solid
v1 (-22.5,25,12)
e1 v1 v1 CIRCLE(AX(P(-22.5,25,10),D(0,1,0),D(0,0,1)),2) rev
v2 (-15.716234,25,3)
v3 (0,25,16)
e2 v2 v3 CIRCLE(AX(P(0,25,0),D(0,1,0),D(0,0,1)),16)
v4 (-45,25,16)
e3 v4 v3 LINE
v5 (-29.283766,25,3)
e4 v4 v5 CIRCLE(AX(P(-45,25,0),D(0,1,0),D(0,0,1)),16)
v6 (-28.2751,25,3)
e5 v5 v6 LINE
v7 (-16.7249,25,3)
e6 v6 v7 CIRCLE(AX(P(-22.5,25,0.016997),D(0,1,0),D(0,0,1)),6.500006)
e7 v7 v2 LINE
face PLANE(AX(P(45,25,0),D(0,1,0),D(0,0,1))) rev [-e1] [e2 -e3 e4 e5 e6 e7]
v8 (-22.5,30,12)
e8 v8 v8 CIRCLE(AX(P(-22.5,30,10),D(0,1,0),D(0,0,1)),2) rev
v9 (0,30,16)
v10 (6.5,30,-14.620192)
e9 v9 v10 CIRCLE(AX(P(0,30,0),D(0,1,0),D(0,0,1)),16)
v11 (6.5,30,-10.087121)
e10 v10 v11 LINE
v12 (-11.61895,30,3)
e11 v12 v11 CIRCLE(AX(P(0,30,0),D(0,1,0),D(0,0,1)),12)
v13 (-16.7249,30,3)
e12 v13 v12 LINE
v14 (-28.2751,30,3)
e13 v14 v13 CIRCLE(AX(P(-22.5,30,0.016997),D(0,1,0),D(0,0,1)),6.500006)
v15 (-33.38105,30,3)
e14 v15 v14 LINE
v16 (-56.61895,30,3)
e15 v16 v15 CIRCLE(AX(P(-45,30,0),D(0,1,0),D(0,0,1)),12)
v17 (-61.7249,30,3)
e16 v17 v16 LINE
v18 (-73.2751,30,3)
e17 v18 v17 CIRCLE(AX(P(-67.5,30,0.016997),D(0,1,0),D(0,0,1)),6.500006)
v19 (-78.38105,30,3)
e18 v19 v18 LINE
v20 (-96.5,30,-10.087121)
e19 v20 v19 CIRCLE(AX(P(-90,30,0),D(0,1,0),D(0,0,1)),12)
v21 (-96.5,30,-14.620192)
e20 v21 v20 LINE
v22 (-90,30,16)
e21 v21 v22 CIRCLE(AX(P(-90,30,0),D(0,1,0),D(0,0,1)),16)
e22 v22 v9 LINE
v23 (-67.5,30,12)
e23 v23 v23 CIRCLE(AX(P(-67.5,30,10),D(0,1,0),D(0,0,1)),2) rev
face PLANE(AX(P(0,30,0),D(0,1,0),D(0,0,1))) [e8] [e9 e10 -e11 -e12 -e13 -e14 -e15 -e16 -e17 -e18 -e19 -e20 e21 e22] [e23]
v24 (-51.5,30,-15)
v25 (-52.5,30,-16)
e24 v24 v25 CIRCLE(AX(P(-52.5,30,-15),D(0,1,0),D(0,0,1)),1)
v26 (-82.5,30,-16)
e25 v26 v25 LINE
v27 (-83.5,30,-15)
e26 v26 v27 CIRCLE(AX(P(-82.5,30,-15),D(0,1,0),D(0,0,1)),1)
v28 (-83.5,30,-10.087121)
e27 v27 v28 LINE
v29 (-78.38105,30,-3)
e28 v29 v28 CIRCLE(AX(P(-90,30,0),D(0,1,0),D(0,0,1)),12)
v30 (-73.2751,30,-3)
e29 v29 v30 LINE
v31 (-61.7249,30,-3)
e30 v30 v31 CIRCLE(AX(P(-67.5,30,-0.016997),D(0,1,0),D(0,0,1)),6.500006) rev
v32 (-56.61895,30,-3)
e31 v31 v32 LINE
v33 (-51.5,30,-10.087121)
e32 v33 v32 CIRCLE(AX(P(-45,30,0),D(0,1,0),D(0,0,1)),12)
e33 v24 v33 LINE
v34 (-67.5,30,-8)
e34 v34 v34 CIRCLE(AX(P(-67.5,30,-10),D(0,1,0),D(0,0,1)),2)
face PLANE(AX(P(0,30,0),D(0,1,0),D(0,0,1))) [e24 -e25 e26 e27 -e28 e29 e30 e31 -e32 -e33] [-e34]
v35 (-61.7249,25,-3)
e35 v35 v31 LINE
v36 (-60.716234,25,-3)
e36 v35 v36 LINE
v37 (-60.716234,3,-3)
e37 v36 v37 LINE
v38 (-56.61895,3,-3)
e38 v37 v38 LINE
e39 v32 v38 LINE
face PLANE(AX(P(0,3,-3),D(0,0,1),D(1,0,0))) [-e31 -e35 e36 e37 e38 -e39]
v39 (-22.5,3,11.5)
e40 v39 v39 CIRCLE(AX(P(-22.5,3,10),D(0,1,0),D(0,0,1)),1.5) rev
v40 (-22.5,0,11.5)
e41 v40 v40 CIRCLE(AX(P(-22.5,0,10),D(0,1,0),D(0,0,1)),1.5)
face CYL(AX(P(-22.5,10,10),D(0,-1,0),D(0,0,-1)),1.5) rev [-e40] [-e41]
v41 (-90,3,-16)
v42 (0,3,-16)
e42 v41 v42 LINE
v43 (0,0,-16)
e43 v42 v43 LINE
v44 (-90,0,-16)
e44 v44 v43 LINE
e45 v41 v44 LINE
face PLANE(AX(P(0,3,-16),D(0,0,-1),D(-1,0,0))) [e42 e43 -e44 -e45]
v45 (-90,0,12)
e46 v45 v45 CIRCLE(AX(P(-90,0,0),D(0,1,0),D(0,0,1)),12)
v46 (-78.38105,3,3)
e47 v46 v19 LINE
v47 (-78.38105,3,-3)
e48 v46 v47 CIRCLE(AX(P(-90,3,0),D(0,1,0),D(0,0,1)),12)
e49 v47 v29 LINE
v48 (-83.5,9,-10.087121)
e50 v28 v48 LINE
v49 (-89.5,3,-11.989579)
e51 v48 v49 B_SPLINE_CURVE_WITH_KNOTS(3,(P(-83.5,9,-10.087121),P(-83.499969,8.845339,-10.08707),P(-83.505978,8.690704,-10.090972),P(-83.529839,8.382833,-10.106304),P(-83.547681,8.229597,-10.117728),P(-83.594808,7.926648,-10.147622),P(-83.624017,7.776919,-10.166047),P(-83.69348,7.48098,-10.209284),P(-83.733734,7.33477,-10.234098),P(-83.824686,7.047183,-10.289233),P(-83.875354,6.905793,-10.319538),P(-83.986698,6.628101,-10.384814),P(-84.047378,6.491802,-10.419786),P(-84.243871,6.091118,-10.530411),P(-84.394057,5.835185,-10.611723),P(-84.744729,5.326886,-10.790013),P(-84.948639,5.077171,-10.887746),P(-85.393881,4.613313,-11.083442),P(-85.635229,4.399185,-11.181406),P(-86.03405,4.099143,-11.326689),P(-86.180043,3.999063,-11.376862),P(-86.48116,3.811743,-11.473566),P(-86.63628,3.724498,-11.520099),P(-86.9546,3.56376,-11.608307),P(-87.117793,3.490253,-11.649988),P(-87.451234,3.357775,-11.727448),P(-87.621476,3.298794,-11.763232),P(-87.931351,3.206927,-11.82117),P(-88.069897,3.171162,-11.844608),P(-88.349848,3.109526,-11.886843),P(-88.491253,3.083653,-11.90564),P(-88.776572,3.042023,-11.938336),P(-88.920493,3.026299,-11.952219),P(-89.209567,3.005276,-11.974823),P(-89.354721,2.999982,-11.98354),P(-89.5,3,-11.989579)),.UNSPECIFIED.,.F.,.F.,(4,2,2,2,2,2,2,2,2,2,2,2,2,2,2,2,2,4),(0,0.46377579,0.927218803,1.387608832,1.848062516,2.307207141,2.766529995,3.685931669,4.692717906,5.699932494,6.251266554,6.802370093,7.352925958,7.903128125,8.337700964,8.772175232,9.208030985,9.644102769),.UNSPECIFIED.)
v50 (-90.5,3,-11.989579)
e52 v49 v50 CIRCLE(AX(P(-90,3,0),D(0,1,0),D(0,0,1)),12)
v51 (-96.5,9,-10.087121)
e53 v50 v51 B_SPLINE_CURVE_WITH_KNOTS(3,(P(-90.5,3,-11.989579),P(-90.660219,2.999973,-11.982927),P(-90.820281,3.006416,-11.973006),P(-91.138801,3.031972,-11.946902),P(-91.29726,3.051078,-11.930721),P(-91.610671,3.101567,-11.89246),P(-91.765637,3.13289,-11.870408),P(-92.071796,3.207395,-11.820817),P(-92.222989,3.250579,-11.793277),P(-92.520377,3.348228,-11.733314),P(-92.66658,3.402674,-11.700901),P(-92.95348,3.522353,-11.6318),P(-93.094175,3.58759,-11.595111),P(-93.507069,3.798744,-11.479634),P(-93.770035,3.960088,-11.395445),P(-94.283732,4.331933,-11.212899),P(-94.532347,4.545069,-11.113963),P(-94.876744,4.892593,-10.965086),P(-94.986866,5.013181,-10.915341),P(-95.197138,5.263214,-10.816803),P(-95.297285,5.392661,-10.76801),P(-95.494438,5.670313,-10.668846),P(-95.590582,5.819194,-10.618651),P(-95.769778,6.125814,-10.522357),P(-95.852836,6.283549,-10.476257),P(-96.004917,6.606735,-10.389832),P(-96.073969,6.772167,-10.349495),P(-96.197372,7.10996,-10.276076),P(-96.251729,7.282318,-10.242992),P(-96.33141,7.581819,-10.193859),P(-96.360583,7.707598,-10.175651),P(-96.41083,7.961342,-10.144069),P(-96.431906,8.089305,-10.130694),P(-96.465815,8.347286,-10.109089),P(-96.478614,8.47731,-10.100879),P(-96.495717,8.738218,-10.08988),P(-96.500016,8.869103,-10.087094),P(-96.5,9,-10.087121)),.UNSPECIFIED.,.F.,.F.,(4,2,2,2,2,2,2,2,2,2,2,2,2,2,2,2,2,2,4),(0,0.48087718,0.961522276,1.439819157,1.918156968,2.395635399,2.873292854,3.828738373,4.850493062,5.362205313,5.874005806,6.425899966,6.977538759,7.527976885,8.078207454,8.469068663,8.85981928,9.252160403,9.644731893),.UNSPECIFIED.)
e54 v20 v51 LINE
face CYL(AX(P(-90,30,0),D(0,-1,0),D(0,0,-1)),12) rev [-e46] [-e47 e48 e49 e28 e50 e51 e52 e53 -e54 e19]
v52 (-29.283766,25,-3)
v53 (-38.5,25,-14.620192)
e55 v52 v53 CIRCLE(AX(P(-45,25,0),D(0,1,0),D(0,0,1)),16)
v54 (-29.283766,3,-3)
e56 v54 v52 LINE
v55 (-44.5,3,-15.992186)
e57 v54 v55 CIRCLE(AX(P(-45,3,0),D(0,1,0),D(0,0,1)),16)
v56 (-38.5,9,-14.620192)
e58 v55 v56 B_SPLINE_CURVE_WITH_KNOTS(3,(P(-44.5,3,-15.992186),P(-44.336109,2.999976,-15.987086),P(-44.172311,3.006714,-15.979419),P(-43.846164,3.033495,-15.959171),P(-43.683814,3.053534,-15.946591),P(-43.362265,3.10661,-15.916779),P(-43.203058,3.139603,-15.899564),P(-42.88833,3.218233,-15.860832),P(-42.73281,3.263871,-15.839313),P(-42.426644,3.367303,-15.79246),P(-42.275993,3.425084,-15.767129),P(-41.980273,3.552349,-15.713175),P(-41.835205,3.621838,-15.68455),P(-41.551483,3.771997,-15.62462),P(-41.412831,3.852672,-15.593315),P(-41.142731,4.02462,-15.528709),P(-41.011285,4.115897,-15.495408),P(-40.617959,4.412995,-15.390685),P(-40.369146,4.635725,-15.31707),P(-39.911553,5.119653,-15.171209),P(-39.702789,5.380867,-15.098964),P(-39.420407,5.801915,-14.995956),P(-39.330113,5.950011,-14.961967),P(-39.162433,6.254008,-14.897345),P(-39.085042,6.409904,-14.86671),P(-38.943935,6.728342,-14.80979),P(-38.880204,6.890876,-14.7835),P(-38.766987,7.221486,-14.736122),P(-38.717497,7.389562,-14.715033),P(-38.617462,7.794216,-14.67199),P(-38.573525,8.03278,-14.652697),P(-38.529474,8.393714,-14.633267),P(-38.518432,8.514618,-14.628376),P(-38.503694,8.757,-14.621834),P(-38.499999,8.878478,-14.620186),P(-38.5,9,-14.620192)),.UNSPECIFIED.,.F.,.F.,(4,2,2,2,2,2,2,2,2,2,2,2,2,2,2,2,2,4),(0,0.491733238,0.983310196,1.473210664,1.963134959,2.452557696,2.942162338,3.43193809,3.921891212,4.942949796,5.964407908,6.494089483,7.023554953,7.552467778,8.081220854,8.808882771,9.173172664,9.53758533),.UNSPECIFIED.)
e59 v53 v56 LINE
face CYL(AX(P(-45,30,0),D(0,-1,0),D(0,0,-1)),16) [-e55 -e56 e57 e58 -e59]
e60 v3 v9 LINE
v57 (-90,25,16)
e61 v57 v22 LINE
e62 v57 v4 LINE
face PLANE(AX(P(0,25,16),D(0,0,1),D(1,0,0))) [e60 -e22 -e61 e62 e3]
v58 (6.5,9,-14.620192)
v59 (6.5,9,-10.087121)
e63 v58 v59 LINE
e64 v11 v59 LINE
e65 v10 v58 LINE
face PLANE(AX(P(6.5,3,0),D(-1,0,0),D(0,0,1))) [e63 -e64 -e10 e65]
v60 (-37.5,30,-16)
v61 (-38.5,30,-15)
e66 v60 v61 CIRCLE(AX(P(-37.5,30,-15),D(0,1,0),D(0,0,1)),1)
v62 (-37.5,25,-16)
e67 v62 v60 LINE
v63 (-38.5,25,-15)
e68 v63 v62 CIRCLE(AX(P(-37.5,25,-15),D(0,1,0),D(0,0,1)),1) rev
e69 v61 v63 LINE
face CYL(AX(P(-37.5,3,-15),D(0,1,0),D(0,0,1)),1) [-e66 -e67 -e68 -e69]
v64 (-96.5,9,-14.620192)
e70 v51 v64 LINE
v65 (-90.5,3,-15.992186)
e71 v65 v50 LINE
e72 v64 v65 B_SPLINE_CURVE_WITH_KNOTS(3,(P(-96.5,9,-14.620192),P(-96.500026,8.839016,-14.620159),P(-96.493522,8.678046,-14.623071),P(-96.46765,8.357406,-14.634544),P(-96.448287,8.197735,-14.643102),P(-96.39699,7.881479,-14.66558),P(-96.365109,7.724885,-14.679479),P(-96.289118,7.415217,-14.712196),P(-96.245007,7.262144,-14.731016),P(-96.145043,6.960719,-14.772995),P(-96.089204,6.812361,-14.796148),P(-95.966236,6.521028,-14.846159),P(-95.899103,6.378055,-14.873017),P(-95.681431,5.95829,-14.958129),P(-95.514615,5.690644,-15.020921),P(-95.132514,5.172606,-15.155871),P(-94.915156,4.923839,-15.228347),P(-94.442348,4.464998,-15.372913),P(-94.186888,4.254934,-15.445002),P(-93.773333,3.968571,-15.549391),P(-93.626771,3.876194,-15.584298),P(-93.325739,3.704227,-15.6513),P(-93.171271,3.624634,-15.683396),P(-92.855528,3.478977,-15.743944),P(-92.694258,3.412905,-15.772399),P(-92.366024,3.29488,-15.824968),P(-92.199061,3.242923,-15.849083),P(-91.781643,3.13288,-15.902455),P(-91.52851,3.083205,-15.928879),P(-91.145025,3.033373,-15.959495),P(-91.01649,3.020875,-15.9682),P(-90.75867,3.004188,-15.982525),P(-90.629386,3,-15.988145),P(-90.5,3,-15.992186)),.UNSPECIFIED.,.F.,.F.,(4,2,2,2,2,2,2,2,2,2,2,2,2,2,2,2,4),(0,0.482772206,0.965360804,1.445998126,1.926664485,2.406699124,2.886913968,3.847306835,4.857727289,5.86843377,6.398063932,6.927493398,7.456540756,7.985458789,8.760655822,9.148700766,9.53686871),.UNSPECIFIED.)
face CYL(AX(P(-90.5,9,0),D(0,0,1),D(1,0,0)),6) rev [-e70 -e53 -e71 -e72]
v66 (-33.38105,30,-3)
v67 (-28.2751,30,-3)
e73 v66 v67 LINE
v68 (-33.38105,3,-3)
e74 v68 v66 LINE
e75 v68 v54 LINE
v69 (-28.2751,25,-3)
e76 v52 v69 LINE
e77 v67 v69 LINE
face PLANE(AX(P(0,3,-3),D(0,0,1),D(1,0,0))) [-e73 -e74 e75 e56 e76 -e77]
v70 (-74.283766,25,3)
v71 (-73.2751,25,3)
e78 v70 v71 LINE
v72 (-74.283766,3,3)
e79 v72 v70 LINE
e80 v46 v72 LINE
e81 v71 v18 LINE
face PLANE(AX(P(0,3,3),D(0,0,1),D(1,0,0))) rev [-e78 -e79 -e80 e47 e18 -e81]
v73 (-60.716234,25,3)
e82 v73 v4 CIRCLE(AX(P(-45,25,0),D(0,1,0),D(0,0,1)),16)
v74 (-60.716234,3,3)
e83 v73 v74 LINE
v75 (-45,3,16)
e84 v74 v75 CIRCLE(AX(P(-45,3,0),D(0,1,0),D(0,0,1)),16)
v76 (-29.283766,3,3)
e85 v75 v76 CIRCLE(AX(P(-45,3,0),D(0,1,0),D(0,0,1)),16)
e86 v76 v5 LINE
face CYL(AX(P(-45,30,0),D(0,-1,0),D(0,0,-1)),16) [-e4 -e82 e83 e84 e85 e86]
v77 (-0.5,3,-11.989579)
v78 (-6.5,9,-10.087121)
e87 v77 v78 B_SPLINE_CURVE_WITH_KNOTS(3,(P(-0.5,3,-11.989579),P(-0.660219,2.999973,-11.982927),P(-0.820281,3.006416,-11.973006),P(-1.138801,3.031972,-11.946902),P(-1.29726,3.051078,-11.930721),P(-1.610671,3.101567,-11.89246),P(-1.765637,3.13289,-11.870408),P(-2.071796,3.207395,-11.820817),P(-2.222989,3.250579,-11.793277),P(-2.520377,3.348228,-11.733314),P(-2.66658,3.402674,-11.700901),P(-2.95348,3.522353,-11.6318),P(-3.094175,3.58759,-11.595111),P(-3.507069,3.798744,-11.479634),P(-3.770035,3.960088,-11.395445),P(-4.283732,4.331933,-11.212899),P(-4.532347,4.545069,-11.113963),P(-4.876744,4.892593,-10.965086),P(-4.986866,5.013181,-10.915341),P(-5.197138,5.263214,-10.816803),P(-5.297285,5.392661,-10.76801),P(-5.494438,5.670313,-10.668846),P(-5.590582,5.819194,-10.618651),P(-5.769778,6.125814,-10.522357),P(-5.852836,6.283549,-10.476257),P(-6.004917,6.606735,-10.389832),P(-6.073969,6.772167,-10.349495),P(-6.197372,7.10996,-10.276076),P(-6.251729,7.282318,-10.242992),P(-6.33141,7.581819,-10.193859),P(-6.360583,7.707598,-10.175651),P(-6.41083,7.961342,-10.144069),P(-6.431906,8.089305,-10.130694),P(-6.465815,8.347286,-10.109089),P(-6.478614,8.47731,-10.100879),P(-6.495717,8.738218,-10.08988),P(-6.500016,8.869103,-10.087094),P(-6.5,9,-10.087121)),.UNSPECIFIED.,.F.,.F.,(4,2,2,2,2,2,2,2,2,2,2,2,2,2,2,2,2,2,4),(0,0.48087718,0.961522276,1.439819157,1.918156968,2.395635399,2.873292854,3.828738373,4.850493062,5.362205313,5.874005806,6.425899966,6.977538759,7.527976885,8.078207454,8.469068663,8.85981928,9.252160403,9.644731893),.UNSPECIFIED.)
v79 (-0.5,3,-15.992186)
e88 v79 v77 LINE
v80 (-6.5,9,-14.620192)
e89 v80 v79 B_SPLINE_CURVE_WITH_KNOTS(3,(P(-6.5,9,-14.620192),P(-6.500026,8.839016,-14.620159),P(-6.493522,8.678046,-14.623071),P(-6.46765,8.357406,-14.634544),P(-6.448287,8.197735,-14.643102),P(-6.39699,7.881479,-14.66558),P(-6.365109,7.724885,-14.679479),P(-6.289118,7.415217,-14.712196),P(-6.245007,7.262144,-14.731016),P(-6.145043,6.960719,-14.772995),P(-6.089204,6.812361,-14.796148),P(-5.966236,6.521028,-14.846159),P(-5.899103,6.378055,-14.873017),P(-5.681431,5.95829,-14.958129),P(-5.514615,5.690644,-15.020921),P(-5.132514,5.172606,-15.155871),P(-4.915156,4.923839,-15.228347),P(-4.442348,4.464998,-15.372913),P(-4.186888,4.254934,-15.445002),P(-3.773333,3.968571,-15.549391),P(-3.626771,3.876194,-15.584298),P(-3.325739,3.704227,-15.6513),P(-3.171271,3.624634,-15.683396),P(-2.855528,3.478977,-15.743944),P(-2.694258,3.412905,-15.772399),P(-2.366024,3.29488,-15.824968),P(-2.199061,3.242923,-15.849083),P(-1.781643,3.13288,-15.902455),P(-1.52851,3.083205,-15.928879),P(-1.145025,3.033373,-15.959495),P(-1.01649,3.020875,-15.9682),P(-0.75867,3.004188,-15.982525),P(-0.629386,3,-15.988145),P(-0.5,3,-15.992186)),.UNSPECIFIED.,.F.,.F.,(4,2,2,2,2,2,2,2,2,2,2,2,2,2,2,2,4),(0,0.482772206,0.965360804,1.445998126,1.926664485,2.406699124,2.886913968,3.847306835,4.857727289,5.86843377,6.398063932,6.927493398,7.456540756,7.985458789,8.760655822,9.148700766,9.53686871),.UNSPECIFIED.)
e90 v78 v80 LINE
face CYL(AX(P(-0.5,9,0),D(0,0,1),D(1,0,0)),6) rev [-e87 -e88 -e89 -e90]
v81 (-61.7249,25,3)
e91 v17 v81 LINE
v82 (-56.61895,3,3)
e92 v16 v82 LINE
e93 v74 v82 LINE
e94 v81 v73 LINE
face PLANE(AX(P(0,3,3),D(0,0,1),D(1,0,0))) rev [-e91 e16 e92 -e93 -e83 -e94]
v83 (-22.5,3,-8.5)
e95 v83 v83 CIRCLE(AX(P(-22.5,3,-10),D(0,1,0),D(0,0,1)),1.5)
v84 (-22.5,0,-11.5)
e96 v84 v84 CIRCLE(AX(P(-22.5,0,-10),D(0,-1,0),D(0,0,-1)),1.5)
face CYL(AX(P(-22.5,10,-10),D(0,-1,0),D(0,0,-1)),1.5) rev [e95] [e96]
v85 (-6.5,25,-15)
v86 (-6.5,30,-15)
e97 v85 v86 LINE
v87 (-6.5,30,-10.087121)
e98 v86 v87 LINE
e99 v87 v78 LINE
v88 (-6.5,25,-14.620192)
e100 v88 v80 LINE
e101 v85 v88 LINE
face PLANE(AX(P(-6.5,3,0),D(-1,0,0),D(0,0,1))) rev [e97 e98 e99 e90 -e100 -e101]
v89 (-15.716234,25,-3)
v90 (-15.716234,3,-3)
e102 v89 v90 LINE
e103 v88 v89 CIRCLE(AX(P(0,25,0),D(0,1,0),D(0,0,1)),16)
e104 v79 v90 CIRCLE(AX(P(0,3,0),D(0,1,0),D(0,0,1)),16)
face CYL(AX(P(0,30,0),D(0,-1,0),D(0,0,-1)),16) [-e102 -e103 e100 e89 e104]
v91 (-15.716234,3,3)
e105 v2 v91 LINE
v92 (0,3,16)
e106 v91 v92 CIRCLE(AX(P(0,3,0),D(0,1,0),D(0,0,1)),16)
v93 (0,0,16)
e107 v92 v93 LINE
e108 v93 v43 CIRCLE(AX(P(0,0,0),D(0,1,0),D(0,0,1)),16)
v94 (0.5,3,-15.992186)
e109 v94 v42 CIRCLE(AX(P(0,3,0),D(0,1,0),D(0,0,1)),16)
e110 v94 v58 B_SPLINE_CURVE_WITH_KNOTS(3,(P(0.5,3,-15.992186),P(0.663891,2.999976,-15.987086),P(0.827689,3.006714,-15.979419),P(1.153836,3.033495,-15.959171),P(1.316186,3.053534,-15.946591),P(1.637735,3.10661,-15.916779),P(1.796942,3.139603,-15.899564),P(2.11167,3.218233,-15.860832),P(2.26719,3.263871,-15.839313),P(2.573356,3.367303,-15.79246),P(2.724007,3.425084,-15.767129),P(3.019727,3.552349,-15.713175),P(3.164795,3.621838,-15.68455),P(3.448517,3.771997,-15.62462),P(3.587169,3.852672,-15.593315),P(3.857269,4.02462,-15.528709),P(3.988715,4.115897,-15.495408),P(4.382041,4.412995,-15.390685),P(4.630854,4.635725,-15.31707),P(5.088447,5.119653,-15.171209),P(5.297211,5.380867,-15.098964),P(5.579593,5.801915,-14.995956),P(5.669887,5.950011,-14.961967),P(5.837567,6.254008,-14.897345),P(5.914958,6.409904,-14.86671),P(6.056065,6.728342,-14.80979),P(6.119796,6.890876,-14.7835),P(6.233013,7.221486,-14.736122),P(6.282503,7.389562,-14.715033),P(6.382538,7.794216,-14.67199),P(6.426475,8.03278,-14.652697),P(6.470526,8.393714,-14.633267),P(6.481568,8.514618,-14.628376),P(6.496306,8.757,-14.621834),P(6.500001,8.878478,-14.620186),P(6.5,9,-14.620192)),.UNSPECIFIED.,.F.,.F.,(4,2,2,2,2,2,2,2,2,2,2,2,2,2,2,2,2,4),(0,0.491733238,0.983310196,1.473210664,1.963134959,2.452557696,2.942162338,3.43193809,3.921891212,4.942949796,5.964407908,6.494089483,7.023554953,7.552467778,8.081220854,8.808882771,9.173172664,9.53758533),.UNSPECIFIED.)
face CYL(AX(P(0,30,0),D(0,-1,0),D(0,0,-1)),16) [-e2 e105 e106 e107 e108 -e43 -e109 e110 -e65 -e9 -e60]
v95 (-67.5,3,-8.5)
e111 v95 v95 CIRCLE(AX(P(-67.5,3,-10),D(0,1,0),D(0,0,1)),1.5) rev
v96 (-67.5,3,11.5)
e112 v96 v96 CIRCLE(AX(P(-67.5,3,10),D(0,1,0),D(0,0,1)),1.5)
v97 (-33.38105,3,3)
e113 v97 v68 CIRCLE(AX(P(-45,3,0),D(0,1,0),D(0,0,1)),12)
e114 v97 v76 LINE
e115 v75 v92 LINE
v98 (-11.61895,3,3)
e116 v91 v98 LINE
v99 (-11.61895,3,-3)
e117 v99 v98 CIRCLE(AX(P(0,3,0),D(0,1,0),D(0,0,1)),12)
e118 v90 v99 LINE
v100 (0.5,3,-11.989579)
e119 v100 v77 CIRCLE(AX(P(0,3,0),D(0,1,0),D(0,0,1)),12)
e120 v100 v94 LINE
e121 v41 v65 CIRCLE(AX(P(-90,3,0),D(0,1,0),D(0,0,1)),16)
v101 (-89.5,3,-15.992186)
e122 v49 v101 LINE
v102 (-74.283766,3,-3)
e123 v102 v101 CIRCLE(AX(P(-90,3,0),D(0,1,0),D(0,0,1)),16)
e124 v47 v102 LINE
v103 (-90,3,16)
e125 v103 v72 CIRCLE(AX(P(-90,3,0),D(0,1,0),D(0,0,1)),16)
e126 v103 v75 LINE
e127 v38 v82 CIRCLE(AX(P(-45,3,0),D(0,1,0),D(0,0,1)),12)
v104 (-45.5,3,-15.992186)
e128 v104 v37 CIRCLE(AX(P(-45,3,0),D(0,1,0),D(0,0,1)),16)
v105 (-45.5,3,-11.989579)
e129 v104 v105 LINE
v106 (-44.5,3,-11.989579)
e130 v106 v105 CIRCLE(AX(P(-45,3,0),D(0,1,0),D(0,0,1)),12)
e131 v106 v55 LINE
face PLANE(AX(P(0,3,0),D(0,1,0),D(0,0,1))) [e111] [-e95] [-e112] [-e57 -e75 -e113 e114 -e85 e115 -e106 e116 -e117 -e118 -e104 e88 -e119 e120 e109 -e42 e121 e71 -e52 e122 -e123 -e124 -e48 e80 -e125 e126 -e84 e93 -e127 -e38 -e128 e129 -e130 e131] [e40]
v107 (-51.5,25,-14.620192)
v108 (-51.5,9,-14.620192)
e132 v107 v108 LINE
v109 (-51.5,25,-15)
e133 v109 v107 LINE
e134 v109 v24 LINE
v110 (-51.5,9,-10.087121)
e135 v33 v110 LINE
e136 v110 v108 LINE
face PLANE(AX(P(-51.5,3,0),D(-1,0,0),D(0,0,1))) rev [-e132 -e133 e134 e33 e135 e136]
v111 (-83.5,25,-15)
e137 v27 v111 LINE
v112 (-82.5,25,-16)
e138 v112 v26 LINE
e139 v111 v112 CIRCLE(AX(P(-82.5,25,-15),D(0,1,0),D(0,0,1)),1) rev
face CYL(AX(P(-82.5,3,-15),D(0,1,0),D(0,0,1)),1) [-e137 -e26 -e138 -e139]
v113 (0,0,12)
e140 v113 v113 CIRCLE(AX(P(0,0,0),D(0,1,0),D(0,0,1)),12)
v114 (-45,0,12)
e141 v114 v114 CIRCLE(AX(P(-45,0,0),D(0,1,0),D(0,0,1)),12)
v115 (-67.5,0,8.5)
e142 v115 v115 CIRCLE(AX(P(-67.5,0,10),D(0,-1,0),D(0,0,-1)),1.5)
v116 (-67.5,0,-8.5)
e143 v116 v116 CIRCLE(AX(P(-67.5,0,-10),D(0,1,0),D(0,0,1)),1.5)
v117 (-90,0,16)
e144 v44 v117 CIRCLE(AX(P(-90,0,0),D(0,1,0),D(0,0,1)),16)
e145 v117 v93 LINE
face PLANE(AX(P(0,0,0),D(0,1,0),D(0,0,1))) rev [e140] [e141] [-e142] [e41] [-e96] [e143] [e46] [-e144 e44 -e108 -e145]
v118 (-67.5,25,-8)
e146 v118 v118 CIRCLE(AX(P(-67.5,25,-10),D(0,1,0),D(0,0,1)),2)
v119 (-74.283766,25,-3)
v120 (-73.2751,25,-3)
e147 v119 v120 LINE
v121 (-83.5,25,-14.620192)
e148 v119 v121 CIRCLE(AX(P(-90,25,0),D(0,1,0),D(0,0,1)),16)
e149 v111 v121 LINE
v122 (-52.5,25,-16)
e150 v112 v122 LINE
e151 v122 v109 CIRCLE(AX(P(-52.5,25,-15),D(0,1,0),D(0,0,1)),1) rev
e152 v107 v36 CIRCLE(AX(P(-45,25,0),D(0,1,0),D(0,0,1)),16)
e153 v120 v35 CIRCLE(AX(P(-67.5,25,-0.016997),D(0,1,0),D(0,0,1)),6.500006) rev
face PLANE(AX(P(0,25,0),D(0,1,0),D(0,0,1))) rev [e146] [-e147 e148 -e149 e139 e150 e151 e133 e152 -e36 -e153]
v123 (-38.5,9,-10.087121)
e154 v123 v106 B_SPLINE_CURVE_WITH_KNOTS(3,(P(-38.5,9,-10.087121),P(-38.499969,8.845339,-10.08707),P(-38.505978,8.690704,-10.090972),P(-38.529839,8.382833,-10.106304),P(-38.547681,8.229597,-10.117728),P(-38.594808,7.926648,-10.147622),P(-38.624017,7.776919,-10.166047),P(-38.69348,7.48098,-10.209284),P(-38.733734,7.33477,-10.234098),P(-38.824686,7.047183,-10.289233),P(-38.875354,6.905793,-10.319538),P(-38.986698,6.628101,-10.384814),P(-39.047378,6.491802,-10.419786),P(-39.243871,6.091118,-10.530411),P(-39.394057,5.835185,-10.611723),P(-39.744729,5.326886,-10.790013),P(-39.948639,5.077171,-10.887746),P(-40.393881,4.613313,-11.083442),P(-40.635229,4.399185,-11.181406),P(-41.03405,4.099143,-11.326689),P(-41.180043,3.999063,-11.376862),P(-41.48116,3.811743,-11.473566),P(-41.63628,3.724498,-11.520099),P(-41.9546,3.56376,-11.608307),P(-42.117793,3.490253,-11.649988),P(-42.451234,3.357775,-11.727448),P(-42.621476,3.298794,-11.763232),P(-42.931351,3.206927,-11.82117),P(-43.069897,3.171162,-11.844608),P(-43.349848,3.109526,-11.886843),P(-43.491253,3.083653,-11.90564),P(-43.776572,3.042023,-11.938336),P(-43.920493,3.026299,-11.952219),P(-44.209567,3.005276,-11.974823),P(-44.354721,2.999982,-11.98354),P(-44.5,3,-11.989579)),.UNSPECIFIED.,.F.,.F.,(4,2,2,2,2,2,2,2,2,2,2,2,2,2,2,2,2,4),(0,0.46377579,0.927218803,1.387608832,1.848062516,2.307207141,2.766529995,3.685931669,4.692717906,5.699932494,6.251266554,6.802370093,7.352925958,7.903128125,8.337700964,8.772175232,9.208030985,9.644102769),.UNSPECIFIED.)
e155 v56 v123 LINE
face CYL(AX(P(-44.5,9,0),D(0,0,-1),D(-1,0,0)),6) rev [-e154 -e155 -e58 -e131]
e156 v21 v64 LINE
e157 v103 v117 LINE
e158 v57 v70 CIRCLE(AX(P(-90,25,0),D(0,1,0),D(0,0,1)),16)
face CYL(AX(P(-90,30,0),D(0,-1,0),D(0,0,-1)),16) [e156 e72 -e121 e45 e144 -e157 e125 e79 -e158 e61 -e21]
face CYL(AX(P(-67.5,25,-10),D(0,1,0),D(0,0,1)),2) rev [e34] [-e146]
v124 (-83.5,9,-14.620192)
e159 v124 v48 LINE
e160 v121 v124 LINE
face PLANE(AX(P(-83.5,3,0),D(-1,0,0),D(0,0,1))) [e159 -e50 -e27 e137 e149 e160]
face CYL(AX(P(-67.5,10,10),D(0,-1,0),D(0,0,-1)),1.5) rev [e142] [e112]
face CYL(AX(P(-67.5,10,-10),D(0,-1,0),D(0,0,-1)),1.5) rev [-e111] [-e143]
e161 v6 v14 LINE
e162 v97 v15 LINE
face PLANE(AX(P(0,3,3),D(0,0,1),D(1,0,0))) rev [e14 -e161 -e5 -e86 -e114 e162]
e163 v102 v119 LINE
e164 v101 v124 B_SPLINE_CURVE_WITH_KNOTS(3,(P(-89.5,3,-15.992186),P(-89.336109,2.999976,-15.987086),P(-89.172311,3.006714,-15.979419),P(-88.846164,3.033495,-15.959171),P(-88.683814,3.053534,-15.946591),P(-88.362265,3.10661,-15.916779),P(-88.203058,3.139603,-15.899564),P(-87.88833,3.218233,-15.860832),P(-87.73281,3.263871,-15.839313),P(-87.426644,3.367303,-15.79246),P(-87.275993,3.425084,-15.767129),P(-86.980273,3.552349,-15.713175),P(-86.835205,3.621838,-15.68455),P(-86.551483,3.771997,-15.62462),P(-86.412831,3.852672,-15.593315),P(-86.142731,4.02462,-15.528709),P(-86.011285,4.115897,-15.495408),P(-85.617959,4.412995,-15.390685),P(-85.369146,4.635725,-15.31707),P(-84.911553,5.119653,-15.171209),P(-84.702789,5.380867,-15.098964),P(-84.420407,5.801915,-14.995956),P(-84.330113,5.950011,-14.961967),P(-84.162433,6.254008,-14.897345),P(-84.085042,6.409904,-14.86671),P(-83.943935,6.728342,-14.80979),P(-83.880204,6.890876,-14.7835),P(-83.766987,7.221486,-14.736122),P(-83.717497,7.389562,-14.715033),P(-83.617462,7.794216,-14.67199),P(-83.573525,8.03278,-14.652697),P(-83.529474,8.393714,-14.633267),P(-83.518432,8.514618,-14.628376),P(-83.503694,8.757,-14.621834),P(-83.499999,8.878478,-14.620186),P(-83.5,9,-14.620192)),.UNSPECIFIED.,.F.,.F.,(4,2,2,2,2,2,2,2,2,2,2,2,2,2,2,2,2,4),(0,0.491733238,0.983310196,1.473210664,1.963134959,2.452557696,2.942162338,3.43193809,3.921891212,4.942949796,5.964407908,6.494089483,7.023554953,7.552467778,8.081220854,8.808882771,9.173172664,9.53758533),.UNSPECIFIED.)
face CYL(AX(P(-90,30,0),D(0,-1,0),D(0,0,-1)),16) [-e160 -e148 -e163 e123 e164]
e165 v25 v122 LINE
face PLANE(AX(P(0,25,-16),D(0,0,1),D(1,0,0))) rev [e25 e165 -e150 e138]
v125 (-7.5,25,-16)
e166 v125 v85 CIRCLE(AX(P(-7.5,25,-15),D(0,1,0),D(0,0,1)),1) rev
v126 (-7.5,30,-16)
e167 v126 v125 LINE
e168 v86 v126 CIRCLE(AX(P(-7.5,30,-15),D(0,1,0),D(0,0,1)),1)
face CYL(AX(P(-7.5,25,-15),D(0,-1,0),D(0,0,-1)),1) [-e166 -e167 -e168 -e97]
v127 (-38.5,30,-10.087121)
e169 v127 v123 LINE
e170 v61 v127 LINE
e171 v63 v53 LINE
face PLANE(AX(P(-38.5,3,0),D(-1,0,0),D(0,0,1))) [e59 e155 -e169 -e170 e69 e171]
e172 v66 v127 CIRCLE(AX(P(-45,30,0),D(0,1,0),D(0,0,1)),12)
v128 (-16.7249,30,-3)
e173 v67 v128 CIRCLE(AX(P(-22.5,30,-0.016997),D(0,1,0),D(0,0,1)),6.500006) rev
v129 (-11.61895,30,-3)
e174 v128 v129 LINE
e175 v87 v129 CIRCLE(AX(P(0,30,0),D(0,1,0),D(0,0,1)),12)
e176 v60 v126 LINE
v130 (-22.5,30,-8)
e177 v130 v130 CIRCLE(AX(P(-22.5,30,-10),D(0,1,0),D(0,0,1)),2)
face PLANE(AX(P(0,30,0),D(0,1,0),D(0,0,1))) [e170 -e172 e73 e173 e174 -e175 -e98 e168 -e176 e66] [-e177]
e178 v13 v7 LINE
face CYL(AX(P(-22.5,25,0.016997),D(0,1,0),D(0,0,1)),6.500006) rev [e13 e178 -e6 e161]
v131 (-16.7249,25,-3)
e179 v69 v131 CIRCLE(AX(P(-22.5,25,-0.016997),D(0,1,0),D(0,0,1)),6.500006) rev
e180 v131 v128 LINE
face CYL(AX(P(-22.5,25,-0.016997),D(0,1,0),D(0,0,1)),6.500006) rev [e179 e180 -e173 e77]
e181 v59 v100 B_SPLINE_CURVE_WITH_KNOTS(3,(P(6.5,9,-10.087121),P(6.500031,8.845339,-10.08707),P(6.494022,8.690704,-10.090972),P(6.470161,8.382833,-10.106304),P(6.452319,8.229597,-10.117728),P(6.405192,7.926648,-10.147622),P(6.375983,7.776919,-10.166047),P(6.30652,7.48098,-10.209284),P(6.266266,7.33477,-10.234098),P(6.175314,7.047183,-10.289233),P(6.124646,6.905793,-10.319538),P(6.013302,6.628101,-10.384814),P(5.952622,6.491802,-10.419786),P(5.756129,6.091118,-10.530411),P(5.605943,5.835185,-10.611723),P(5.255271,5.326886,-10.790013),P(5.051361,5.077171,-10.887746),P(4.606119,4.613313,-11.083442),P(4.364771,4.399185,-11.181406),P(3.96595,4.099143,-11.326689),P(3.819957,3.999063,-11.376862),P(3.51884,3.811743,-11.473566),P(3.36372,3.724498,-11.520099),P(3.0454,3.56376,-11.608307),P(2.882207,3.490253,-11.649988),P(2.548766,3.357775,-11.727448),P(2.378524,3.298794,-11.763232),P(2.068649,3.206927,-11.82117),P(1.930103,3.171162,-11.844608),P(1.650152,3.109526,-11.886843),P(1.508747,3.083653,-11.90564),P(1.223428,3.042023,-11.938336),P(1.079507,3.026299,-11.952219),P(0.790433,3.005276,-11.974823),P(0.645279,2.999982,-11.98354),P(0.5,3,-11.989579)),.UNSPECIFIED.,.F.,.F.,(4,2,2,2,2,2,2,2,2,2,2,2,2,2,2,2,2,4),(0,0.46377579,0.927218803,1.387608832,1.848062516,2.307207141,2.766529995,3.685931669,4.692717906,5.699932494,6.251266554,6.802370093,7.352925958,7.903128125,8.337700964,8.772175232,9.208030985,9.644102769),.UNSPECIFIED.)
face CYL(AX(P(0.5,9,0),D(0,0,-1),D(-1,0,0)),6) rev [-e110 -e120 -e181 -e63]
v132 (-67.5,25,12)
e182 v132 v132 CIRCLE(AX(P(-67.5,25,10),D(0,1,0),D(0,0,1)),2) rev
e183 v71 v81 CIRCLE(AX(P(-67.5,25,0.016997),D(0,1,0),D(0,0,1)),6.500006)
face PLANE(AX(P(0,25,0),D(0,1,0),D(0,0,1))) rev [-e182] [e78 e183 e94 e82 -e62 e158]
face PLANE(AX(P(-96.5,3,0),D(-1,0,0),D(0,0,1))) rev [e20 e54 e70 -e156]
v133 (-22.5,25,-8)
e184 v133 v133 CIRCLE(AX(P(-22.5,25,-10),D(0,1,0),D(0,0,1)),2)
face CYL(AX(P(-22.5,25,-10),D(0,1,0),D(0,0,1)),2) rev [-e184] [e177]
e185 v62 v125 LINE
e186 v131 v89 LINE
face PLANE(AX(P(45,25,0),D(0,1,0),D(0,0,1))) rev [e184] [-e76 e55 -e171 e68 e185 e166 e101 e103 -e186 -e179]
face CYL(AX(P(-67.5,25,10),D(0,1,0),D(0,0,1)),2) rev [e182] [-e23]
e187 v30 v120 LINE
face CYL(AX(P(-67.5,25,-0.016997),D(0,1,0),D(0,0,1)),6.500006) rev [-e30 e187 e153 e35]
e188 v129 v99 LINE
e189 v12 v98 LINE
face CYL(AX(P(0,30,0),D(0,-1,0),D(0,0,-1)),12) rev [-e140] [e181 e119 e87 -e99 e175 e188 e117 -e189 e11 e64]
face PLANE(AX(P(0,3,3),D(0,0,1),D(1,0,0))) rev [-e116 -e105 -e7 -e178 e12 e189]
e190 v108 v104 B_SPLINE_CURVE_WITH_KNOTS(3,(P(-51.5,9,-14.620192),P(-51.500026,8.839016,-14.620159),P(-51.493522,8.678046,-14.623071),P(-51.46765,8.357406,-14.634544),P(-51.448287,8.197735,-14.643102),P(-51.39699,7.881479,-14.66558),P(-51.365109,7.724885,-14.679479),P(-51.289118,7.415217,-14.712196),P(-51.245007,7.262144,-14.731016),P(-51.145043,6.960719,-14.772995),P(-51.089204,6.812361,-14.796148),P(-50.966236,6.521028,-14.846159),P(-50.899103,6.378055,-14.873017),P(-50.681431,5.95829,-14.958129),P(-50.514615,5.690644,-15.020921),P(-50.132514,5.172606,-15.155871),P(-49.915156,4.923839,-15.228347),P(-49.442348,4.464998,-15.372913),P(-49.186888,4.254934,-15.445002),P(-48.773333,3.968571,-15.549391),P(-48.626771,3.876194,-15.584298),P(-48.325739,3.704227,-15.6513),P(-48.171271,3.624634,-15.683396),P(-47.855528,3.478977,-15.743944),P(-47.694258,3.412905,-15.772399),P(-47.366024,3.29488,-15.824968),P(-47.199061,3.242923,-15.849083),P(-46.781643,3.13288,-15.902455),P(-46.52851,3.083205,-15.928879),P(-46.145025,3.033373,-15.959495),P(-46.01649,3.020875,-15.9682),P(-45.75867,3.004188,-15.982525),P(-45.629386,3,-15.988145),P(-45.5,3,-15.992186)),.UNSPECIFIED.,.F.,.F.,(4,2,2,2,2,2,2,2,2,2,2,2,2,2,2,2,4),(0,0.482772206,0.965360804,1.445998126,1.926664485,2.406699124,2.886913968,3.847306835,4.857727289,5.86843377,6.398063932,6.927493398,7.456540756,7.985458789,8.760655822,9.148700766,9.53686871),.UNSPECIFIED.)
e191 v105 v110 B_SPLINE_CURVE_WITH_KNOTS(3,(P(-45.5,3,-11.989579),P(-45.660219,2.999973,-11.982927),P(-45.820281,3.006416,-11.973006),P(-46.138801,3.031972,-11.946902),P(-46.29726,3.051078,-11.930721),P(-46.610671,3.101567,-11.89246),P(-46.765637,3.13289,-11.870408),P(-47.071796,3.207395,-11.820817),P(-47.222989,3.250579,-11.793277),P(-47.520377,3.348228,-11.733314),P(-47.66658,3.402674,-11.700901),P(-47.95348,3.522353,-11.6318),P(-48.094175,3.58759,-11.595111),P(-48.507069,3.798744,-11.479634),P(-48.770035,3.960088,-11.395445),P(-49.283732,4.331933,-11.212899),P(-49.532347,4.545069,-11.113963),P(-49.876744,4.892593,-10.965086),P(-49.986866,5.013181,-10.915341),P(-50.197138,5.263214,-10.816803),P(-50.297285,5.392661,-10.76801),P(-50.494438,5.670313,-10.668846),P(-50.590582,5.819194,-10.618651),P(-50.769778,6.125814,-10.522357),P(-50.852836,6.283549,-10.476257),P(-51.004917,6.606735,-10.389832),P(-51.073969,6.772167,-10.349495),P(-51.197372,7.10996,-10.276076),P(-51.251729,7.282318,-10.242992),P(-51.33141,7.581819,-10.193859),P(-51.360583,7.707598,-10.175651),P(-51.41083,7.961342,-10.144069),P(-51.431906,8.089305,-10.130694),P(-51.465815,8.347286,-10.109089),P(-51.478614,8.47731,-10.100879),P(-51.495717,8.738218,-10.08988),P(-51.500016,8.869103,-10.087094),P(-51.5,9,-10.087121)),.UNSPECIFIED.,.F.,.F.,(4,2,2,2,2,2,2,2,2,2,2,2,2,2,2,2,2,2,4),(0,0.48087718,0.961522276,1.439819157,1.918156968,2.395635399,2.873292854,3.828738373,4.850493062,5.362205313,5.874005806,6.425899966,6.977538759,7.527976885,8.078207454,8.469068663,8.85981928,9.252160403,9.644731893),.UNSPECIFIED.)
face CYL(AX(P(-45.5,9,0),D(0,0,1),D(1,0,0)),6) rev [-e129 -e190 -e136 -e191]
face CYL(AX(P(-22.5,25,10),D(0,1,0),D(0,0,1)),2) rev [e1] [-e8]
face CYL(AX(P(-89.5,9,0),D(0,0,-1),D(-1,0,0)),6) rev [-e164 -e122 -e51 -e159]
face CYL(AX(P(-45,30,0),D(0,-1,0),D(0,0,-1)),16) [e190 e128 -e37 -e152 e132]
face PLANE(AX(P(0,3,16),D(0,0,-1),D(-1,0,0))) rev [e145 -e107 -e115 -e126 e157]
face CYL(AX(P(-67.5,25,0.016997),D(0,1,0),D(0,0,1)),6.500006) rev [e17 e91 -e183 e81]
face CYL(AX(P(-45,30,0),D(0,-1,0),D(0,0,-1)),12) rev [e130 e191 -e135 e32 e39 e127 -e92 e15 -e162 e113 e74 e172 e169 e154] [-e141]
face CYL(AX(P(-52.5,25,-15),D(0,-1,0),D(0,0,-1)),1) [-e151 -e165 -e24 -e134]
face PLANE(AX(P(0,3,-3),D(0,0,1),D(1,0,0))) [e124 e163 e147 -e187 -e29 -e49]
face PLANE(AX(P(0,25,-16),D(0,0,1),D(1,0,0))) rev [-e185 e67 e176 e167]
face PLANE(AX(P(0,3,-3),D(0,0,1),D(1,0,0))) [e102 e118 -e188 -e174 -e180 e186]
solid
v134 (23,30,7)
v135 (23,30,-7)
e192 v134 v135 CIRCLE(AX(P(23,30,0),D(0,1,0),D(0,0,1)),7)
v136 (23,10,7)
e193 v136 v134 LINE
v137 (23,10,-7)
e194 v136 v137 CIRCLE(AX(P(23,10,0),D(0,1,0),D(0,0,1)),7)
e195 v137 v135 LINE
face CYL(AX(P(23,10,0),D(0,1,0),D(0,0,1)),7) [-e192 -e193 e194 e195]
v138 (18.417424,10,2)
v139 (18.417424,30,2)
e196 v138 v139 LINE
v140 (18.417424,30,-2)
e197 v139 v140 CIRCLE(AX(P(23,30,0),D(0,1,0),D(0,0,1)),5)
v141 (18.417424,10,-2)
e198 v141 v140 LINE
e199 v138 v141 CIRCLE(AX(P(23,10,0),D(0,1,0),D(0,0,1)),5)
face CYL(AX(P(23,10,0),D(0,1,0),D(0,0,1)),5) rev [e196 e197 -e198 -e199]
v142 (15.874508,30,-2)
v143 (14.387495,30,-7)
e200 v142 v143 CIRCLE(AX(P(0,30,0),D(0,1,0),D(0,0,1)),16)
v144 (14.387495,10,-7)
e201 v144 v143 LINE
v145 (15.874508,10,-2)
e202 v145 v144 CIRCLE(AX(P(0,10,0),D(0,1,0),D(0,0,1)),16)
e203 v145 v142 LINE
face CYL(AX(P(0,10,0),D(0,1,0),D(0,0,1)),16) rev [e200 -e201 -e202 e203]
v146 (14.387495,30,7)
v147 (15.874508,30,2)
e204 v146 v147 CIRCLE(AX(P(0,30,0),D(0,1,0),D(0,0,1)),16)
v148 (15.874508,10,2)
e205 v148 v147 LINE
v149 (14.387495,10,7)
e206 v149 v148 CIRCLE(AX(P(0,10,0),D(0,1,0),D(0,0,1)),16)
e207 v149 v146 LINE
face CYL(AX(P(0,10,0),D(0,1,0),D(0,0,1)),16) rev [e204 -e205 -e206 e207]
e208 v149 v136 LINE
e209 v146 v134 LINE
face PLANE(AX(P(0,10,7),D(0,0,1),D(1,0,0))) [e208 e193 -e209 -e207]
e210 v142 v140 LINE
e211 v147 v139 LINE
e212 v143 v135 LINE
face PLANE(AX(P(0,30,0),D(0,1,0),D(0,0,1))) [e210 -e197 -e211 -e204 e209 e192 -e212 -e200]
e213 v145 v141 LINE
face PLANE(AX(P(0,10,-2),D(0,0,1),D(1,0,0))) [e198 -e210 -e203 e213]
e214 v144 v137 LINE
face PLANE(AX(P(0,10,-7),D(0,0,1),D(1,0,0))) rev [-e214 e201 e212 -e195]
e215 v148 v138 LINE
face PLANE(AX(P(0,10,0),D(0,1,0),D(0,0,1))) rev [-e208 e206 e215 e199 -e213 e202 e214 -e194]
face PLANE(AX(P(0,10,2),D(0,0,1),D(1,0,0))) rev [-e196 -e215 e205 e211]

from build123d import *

# Parameters (mm, degrees)
SKETCH1_R               = 16
SKETCH1_R_2             = 12
BOSS_EXTRUDE1_DEPTH     = 30
BOSS_EXTRUDE1_2_DEPTH   = 30
BOSS_EXTRUDE1_3_DEPTH   = 30
BOSS_EXTRUDE2_DEPTH     = 3
BOSS_EXTRUDE3_DEPTH     = 20
SKETCH5_R               = 1.5
CUT_EXTRUDE4_DEPTH      = 10
BOSS_EXTRUDE4_START     = -5
BOSS_EXTRUDE4_OUTLINE_R = 2
BOSS_EXTRUDE4_DEPTH     = 5
LPATTERN6_COUNT         = 2
LPATTERN6_PITCH         = 45
SKETCH6_W               = 13
SKETCH6_H               = 20
SKETCH6_W_2             = 77
SKETCH6_H_2             = 6
CUT_EXTRUDE6_DEPTH      = 27
FILLET20_R              = 1
FILLET21_R              = 6


# Read off the part's stored shape, not the designer's step: Boss-Extrude4
with BuildPart() as part:
    # Sketch1 → Boss-Extrude1 (new body)
    with BuildSketch(Plane(origin=(0, 0, 0), x_dir=(1, 0, 0), z_dir=(0, 1, 0))):
        with Locations(Location((0, 0, 0), (0, 0, 270))):
            Circle(SKETCH1_R)
        with Locations(Location((0, 0, 0), (0, 0, 270))):
            Circle(SKETCH1_R_2, mode=Mode.SUBTRACT)
    extrude(amount=BOSS_EXTRUDE1_DEPTH)



with BuildPart() as body_2:
    # Sketch1 → Boss-Extrude1 2 (new body)
    with BuildSketch(Plane(origin=(0, 0, 0), x_dir=(1, 0, 0), z_dir=(0, 1, 0))):
        with Locations(Location((-45, 0, 0), (0, 0, 270))):
            Circle(SKETCH1_R)
        with Locations(Location((-45, 0, 0), (0, 0, 270))):
            Circle(SKETCH1_R_2, mode=Mode.SUBTRACT)
    extrude(amount=BOSS_EXTRUDE1_2_DEPTH)


with BuildPart() as body_3:
    # Sketch1 → Boss-Extrude1 3 (new body)
    with BuildSketch(Plane(origin=(0, 0, 0), x_dir=(1, 0, 0), z_dir=(0, 1, 0))):
        with Locations(Location((-90, 0, 0), (0, 0, 270))):
            Circle(SKETCH1_R)
        with Locations(Location((-90, 0, 0), (0, 0, 270))):
            Circle(SKETCH1_R_2, mode=Mode.SUBTRACT)
    extrude(amount=BOSS_EXTRUDE1_3_DEPTH)


with BuildPart() as part_1:
    add(part.part)

    add(body_2.part)  # Boss-Extrude2 merges body 2

    add(body_3.part)  # Boss-Extrude2 merges body 3
    # Sketch2 → Boss-Extrude2 (add)
    with BuildSketch(Plane(origin=(0, 0, 0), x_dir=(1, 0, 0), z_dir=(0, 1, 0))):
        with BuildLine():
            Line((-61, 0), (-74, 0))
            ThreePointArc((-74, 0), (-78.686291501, -11.313708499), (-90, -16))
            Line((-90, -16), (-45, -16))
            ThreePointArc((-45, -16), (-56.313708499, -11.313708499), (-61, 0))
        make_face()
        with BuildLine():
            Line((0, 16), (-45, 16))
            ThreePointArc((-45, 16), (-33.686291501, 11.313708499), (-29, 0))
            Line((-29, 0), (-16, 0))
            ThreePointArc((-16, 0), (-11.313708499, 11.313708499), (0, 16))
        make_face()
        with BuildLine():
            ThreePointArc((-29, 0), (-33.686291501, -11.313708499), (-45, -16))
            Line((-45, -16), (0, -16))
            ThreePointArc((0, -16), (-11.313708499, -11.313708499), (-16, 0))
            Line((-16, 0), (-29, 0))
        make_face()
        with BuildLine():
            ThreePointArc((-90, 16), (-78.686291501, 11.313708499), (-74, 0))
            Line((-74, 0), (-61, 0))
            ThreePointArc((-61, 0), (-56.313708499, 11.313708499), (-45, 16))
            Line((-45, 16), (-90, 16))
        make_face()
    extrude(amount=BOSS_EXTRUDE2_DEPTH)

    # Sketch5 → Cut-Extrude4 (cut)
    with BuildSketch(Plane.XZ):
        with Locations(Location((-67.5, 10, 0), (0, 0, 270))):
            Circle(SKETCH5_R)
        with Locations(Location((-67.5, -10, 0), (0, 0, 90))):
            Circle(SKETCH5_R)
        with Locations(Location((-22.5, -10, 0), (0, 0, 270))):
            Circle(SKETCH5_R)
        with Locations(Location((-22.5, 10, 0), (0, 0, 90))):
            Circle(SKETCH5_R)
    extrude(amount=-CUT_EXTRUDE4_DEPTH, mode=Mode.SUBTRACT)

    # Boss-Extrude4 outline → Boss-Extrude4 (add)
    # profile 1 of 2: a face of its own
    with BuildSketch(Plane(origin=(0, 30, 0), x_dir=(1, 0, 0), z_dir=(0, 1, 0)).offset(BOSS_EXTRUDE4_START)):
        with BuildLine():
            ThreePointArc((-74.000004565, -0.012086763), (-78.690565624, -11.317981008), (-90, -16))
            Line((-90, -16), (-45, -16))
            ThreePointArc((-45, -16), (-56.309434376, -11.317981008), (-60.999995435, -0.012086763))
            ThreePointArc((-60.999995435, -0.012086763), (-67.5, -6.517003435), (-74.000004565, -0.012086763))
        make_face()
        with Locations((-67.5, -10)):
            Circle(BOSS_EXTRUDE4_OUTLINE_R, mode=Mode.SUBTRACT)
    # profile 2 of 2: a face of its own
    with BuildSketch(Plane(origin=(0, 30, 0), x_dir=(1, 0, 0), z_dir=(0, 1, 0)).offset(BOSS_EXTRUDE4_START)):
        with BuildLine():
            Line((-45, 16), (-90, 16))
            ThreePointArc((-90, 16), (-78.690565624, 11.317981008), (-74.000004565, 0.012086763))
            ThreePointArc((-74.000004565, 0.012086763), (-67.5, 6.517003435), (-60.999995435, 0.012086763))
            ThreePointArc((-60.999995435, 0.012086763), (-56.309434376, 11.317981008), (-45, 16))
        make_face()
        with Locations((-67.5, 10)):
            Circle(BOSS_EXTRUDE4_OUTLINE_R, mode=Mode.SUBTRACT)
    boss_extrude4 = extrude(amount=BOSS_EXTRUDE4_DEPTH)

    # LPattern6: Boss-Extrude4 ×2
    with Locations(*[(i * LPATTERN6_PITCH, 0, 0) for i in range(1, LPATTERN6_COUNT)]):
        add(boss_extrude4)

    # Sketch6 → Cut-Extrude6 (cut)
    with BuildSketch(Plane(origin=(0, 30, 0), x_dir=(1, 0, 0), z_dir=(0, 1, 0))):
        with Locations((-45, 10)):
            Rectangle(SKETCH6_W, SKETCH6_H)
        with Locations((0, 10)):
            Rectangle(SKETCH6_W, SKETCH6_H)
        with Locations((-90, 10)):
            Rectangle(SKETCH6_W, SKETCH6_H)
        with Locations((-45, 0)):
            Rectangle(SKETCH6_W_2, SKETCH6_H_2)
    extrude(amount=-CUT_EXTRUDE6_DEPTH, mode=Mode.SUBTRACT)

    # Fillet20
    fillet20_edges = [part_1.edges().sort_by_distance(p)[0] for p in [
        (-51.5, 27.5, -16),
        (-6.5, 27.5, -16),
        (-38.5, 27.5, -16),
        (-83.5, 27.5, -16),
    ]]
    fillet(fillet20_edges, radius=FILLET20_R)

    # Fillet21
    # the kernel refuses this fillet: 6 mm, written as the material it adds along each edge
    with BuildSketch(Plane(origin=(-38.5, 3, 4.912879499), x_dir=(0, 1, 0), z_dir=(0, 0, -1))) as fillet21_piece_1_section:
        with BuildLine():
            CenterArc((FILLET21_R, -FILLET21_R), FILLET21_R, 90, 90)
            Line((0, -FILLET21_R), (0, 0))
            Line((0, 0), (FILLET21_R, 0))
        make_face()
    fillet21_piece_1 = extrude(amount=34.533071016, mode=Mode.PRIVATE)
    fillet21_piece_1 = fillet21_piece_1 - Plane(origin=(-45, 4.386828821, 0), x_dir=(0, 0, 1), z_dir=(0, -1, 0)) * Cylinder(12, 94, mode=Mode.PRIVATE)
    fillet21_piece_1 = fillet21_piece_1 & Plane(origin=(-45, 4.386828821, 0), x_dir=(0, 0, 1), z_dir=(0, -1, 0)) * Cylinder(16, 94, mode=Mode.PRIVATE)
    add(fillet21_piece_1)
    with BuildSketch(Plane(origin=(6.5, 3, 4.912879499), x_dir=(-1, 0, 0), z_dir=(0, 0, -1))) as fillet21_piece_2_section:
        with BuildLine():
            CenterArc((FILLET21_R, FILLET21_R), FILLET21_R, 180, 90)
            Line((0, FILLET21_R), (0, 0))
            Line((0, 0), (FILLET21_R, 0))
        make_face()
    fillet21_piece_2 = extrude(amount=34.533071016, mode=Mode.PRIVATE)
    fillet21_piece_2 = fillet21_piece_2 - Plane(origin=(0, 4.386829335, 0), x_dir=(0, 0, 1), z_dir=(0, -1, 0)) * Cylinder(12, 94, mode=Mode.PRIVATE)
    fillet21_piece_2 = fillet21_piece_2 & Plane(origin=(0, 4.386829335, 0), x_dir=(0, 0, 1), z_dir=(0, -1, 0)) * Cylinder(16, 94, mode=Mode.PRIVATE)
    add(fillet21_piece_2)
    with BuildSketch(Plane(origin=(-83.5, 3, 4.912879499), x_dir=(-1, 0, 0), z_dir=(0, 0, -1))) as fillet21_piece_3_section:
        with BuildLine():
            CenterArc((FILLET21_R, FILLET21_R), FILLET21_R, 180, 90)
            Line((0, FILLET21_R), (0, 0))
            Line((0, 0), (FILLET21_R, 0))
        make_face()
    fillet21_piece_3 = extrude(amount=34.533071016, mode=Mode.PRIVATE)
    fillet21_piece_3 = fillet21_piece_3 - Plane(origin=(-90, 4.386829335, 0), x_dir=(0, 0, 1), z_dir=(0, -1, 0)) * Cylinder(12, 94, mode=Mode.PRIVATE)
    fillet21_piece_3 = fillet21_piece_3 & Plane(origin=(-90, 4.386829335, 0), x_dir=(0, 0, 1), z_dir=(0, -1, 0)) * Cylinder(16, 94, mode=Mode.PRIVATE)
    add(fillet21_piece_3)
    with BuildSketch(Plane(origin=(-96.5, 3, -29.620191517), x_dir=(1, 0, 0), z_dir=(0, 0, 1))) as fillet21_piece_4_section:
        with BuildLine():
            CenterArc((FILLET21_R, FILLET21_R), FILLET21_R, 180, 90)
            Line((0, FILLET21_R), (0, 0))
            Line((0, 0), (FILLET21_R, 0))
        make_face()
    fillet21_piece_4 = extrude(amount=34.533071016, mode=Mode.PRIVATE)
    fillet21_piece_4 = fillet21_piece_4 & Plane(origin=(-90, 4.386829274, 0), x_dir=(0, 0, 1), z_dir=(0, -1, 0)) * Cylinder(16, 94, mode=Mode.PRIVATE)
    fillet21_piece_4 = fillet21_piece_4 - Plane(origin=(-90, 4.386829274, 0), x_dir=(0, 0, 1), z_dir=(0, -1, 0)) * Cylinder(12, 94, mode=Mode.PRIVATE)
    add(fillet21_piece_4)
    with BuildSketch(Plane(origin=(-51.5, 3, -29.620191517), x_dir=(1, 0, 0), z_dir=(0, 0, 1))) as fillet21_piece_5_section:
        with BuildLine():
            CenterArc((FILLET21_R, FILLET21_R), FILLET21_R, 180, 90)
            Line((0, FILLET21_R), (0, 0))
            Line((0, 0), (FILLET21_R, 0))
        make_face()
    fillet21_piece_5 = extrude(amount=34.533071016, mode=Mode.PRIVATE)
    fillet21_piece_5 = fillet21_piece_5 & Plane(origin=(-45, 4.386829361, 0), x_dir=(0, 0, 1), z_dir=(0, -1, 0)) * Cylinder(16, 94, mode=Mode.PRIVATE)
    fillet21_piece_5 = fillet21_piece_5 - Plane(origin=(-45, 4.386829361, 0), x_dir=(0, 0, 1), z_dir=(0, -1, 0)) * Cylinder(12, 94, mode=Mode.PRIVATE)
    add(fillet21_piece_5)
    with BuildSketch(Plane(origin=(-6.5, 3, -29.620191517), x_dir=(0, 1, 0), z_dir=(0, 0, 1))) as fillet21_piece_6_section:
        with BuildLine():
            CenterArc((FILLET21_R, -FILLET21_R), FILLET21_R, 90, 90)
            Line((0, -FILLET21_R), (0, 0))
            Line((0, 0), (FILLET21_R, 0))
        make_face()
    fillet21_piece_6 = extrude(amount=34.533071016, mode=Mode.PRIVATE)
    fillet21_piece_6 = fillet21_piece_6 - Plane(origin=(0, 4.386829879, 0), x_dir=(0, 0, 1), z_dir=(0, -1, 0)) * Cylinder(12, 94, mode=Mode.PRIVATE)
    fillet21_piece_6 = fillet21_piece_6 & Plane(origin=(0, 4.386829879, 0), x_dir=(0, 0, 1), z_dir=(0, -1, 0)) * Cylinder(16, 94, mode=Mode.PRIVATE)
    add(fillet21_piece_6)


with BuildPart() as body_2_2:
    # Sketch3 → Boss-Extrude3 (new body)
    with BuildSketch(Plane(origin=(0, 30, 0), x_dir=(1, 0, 0), z_dir=(0, 1, 0))):
        with BuildLine():
            ThreePointArc((30, 0), (27.949747468, 4.949747468), (23, 7))
            ThreePointArc((23, 7), (18.816699867, 5.61248608), (16.291796068, 2))
            Line((16.291796068, 2), (18.417424305, 2))
            ThreePointArc((18.417424305, 2), (24.021548218, 4.894531565), (28, 0))
            ThreePointArc((28, 0), (24.021548218, -4.894531565), (18.417424305, -2))
            Line((18.417424305, -2), (16.291796068, -2))
            ThreePointArc((16.291796068, -2), (18.816699867, -5.61248608), (23, -7))
            ThreePointArc((23, -7), (27.949747468, -4.949747468), (30, 0))
        make_face()
        with BuildLine():
            ThreePointArc((15.874507866, -2), (15.336140253, -4.561008895), (14.38749457, -7))
            Line((14.38749457, -7), (23, -7))
            ThreePointArc((23, -7), (18.816699867, -5.61248608), (16.291796068, -2))
            Line((16.291796068, -2), (15.874507866, -2))
        make_face()
        with BuildLine():
            Line((23, 7), (14.38749457, 7))
            ThreePointArc((14.38749457, 7), (15.336140253, 4.561008895), (15.874507866, 2))
            Line((15.874507866, 2), (16.291796068, 2))
            ThreePointArc((16.291796068, 2), (18.816699867, 5.61248608), (23, 7))
        make_face()
    extrude(amount=-BOSS_EXTRUDE3_DEPTH)


solid = Compound([part_1.part, body_2_2.part])
